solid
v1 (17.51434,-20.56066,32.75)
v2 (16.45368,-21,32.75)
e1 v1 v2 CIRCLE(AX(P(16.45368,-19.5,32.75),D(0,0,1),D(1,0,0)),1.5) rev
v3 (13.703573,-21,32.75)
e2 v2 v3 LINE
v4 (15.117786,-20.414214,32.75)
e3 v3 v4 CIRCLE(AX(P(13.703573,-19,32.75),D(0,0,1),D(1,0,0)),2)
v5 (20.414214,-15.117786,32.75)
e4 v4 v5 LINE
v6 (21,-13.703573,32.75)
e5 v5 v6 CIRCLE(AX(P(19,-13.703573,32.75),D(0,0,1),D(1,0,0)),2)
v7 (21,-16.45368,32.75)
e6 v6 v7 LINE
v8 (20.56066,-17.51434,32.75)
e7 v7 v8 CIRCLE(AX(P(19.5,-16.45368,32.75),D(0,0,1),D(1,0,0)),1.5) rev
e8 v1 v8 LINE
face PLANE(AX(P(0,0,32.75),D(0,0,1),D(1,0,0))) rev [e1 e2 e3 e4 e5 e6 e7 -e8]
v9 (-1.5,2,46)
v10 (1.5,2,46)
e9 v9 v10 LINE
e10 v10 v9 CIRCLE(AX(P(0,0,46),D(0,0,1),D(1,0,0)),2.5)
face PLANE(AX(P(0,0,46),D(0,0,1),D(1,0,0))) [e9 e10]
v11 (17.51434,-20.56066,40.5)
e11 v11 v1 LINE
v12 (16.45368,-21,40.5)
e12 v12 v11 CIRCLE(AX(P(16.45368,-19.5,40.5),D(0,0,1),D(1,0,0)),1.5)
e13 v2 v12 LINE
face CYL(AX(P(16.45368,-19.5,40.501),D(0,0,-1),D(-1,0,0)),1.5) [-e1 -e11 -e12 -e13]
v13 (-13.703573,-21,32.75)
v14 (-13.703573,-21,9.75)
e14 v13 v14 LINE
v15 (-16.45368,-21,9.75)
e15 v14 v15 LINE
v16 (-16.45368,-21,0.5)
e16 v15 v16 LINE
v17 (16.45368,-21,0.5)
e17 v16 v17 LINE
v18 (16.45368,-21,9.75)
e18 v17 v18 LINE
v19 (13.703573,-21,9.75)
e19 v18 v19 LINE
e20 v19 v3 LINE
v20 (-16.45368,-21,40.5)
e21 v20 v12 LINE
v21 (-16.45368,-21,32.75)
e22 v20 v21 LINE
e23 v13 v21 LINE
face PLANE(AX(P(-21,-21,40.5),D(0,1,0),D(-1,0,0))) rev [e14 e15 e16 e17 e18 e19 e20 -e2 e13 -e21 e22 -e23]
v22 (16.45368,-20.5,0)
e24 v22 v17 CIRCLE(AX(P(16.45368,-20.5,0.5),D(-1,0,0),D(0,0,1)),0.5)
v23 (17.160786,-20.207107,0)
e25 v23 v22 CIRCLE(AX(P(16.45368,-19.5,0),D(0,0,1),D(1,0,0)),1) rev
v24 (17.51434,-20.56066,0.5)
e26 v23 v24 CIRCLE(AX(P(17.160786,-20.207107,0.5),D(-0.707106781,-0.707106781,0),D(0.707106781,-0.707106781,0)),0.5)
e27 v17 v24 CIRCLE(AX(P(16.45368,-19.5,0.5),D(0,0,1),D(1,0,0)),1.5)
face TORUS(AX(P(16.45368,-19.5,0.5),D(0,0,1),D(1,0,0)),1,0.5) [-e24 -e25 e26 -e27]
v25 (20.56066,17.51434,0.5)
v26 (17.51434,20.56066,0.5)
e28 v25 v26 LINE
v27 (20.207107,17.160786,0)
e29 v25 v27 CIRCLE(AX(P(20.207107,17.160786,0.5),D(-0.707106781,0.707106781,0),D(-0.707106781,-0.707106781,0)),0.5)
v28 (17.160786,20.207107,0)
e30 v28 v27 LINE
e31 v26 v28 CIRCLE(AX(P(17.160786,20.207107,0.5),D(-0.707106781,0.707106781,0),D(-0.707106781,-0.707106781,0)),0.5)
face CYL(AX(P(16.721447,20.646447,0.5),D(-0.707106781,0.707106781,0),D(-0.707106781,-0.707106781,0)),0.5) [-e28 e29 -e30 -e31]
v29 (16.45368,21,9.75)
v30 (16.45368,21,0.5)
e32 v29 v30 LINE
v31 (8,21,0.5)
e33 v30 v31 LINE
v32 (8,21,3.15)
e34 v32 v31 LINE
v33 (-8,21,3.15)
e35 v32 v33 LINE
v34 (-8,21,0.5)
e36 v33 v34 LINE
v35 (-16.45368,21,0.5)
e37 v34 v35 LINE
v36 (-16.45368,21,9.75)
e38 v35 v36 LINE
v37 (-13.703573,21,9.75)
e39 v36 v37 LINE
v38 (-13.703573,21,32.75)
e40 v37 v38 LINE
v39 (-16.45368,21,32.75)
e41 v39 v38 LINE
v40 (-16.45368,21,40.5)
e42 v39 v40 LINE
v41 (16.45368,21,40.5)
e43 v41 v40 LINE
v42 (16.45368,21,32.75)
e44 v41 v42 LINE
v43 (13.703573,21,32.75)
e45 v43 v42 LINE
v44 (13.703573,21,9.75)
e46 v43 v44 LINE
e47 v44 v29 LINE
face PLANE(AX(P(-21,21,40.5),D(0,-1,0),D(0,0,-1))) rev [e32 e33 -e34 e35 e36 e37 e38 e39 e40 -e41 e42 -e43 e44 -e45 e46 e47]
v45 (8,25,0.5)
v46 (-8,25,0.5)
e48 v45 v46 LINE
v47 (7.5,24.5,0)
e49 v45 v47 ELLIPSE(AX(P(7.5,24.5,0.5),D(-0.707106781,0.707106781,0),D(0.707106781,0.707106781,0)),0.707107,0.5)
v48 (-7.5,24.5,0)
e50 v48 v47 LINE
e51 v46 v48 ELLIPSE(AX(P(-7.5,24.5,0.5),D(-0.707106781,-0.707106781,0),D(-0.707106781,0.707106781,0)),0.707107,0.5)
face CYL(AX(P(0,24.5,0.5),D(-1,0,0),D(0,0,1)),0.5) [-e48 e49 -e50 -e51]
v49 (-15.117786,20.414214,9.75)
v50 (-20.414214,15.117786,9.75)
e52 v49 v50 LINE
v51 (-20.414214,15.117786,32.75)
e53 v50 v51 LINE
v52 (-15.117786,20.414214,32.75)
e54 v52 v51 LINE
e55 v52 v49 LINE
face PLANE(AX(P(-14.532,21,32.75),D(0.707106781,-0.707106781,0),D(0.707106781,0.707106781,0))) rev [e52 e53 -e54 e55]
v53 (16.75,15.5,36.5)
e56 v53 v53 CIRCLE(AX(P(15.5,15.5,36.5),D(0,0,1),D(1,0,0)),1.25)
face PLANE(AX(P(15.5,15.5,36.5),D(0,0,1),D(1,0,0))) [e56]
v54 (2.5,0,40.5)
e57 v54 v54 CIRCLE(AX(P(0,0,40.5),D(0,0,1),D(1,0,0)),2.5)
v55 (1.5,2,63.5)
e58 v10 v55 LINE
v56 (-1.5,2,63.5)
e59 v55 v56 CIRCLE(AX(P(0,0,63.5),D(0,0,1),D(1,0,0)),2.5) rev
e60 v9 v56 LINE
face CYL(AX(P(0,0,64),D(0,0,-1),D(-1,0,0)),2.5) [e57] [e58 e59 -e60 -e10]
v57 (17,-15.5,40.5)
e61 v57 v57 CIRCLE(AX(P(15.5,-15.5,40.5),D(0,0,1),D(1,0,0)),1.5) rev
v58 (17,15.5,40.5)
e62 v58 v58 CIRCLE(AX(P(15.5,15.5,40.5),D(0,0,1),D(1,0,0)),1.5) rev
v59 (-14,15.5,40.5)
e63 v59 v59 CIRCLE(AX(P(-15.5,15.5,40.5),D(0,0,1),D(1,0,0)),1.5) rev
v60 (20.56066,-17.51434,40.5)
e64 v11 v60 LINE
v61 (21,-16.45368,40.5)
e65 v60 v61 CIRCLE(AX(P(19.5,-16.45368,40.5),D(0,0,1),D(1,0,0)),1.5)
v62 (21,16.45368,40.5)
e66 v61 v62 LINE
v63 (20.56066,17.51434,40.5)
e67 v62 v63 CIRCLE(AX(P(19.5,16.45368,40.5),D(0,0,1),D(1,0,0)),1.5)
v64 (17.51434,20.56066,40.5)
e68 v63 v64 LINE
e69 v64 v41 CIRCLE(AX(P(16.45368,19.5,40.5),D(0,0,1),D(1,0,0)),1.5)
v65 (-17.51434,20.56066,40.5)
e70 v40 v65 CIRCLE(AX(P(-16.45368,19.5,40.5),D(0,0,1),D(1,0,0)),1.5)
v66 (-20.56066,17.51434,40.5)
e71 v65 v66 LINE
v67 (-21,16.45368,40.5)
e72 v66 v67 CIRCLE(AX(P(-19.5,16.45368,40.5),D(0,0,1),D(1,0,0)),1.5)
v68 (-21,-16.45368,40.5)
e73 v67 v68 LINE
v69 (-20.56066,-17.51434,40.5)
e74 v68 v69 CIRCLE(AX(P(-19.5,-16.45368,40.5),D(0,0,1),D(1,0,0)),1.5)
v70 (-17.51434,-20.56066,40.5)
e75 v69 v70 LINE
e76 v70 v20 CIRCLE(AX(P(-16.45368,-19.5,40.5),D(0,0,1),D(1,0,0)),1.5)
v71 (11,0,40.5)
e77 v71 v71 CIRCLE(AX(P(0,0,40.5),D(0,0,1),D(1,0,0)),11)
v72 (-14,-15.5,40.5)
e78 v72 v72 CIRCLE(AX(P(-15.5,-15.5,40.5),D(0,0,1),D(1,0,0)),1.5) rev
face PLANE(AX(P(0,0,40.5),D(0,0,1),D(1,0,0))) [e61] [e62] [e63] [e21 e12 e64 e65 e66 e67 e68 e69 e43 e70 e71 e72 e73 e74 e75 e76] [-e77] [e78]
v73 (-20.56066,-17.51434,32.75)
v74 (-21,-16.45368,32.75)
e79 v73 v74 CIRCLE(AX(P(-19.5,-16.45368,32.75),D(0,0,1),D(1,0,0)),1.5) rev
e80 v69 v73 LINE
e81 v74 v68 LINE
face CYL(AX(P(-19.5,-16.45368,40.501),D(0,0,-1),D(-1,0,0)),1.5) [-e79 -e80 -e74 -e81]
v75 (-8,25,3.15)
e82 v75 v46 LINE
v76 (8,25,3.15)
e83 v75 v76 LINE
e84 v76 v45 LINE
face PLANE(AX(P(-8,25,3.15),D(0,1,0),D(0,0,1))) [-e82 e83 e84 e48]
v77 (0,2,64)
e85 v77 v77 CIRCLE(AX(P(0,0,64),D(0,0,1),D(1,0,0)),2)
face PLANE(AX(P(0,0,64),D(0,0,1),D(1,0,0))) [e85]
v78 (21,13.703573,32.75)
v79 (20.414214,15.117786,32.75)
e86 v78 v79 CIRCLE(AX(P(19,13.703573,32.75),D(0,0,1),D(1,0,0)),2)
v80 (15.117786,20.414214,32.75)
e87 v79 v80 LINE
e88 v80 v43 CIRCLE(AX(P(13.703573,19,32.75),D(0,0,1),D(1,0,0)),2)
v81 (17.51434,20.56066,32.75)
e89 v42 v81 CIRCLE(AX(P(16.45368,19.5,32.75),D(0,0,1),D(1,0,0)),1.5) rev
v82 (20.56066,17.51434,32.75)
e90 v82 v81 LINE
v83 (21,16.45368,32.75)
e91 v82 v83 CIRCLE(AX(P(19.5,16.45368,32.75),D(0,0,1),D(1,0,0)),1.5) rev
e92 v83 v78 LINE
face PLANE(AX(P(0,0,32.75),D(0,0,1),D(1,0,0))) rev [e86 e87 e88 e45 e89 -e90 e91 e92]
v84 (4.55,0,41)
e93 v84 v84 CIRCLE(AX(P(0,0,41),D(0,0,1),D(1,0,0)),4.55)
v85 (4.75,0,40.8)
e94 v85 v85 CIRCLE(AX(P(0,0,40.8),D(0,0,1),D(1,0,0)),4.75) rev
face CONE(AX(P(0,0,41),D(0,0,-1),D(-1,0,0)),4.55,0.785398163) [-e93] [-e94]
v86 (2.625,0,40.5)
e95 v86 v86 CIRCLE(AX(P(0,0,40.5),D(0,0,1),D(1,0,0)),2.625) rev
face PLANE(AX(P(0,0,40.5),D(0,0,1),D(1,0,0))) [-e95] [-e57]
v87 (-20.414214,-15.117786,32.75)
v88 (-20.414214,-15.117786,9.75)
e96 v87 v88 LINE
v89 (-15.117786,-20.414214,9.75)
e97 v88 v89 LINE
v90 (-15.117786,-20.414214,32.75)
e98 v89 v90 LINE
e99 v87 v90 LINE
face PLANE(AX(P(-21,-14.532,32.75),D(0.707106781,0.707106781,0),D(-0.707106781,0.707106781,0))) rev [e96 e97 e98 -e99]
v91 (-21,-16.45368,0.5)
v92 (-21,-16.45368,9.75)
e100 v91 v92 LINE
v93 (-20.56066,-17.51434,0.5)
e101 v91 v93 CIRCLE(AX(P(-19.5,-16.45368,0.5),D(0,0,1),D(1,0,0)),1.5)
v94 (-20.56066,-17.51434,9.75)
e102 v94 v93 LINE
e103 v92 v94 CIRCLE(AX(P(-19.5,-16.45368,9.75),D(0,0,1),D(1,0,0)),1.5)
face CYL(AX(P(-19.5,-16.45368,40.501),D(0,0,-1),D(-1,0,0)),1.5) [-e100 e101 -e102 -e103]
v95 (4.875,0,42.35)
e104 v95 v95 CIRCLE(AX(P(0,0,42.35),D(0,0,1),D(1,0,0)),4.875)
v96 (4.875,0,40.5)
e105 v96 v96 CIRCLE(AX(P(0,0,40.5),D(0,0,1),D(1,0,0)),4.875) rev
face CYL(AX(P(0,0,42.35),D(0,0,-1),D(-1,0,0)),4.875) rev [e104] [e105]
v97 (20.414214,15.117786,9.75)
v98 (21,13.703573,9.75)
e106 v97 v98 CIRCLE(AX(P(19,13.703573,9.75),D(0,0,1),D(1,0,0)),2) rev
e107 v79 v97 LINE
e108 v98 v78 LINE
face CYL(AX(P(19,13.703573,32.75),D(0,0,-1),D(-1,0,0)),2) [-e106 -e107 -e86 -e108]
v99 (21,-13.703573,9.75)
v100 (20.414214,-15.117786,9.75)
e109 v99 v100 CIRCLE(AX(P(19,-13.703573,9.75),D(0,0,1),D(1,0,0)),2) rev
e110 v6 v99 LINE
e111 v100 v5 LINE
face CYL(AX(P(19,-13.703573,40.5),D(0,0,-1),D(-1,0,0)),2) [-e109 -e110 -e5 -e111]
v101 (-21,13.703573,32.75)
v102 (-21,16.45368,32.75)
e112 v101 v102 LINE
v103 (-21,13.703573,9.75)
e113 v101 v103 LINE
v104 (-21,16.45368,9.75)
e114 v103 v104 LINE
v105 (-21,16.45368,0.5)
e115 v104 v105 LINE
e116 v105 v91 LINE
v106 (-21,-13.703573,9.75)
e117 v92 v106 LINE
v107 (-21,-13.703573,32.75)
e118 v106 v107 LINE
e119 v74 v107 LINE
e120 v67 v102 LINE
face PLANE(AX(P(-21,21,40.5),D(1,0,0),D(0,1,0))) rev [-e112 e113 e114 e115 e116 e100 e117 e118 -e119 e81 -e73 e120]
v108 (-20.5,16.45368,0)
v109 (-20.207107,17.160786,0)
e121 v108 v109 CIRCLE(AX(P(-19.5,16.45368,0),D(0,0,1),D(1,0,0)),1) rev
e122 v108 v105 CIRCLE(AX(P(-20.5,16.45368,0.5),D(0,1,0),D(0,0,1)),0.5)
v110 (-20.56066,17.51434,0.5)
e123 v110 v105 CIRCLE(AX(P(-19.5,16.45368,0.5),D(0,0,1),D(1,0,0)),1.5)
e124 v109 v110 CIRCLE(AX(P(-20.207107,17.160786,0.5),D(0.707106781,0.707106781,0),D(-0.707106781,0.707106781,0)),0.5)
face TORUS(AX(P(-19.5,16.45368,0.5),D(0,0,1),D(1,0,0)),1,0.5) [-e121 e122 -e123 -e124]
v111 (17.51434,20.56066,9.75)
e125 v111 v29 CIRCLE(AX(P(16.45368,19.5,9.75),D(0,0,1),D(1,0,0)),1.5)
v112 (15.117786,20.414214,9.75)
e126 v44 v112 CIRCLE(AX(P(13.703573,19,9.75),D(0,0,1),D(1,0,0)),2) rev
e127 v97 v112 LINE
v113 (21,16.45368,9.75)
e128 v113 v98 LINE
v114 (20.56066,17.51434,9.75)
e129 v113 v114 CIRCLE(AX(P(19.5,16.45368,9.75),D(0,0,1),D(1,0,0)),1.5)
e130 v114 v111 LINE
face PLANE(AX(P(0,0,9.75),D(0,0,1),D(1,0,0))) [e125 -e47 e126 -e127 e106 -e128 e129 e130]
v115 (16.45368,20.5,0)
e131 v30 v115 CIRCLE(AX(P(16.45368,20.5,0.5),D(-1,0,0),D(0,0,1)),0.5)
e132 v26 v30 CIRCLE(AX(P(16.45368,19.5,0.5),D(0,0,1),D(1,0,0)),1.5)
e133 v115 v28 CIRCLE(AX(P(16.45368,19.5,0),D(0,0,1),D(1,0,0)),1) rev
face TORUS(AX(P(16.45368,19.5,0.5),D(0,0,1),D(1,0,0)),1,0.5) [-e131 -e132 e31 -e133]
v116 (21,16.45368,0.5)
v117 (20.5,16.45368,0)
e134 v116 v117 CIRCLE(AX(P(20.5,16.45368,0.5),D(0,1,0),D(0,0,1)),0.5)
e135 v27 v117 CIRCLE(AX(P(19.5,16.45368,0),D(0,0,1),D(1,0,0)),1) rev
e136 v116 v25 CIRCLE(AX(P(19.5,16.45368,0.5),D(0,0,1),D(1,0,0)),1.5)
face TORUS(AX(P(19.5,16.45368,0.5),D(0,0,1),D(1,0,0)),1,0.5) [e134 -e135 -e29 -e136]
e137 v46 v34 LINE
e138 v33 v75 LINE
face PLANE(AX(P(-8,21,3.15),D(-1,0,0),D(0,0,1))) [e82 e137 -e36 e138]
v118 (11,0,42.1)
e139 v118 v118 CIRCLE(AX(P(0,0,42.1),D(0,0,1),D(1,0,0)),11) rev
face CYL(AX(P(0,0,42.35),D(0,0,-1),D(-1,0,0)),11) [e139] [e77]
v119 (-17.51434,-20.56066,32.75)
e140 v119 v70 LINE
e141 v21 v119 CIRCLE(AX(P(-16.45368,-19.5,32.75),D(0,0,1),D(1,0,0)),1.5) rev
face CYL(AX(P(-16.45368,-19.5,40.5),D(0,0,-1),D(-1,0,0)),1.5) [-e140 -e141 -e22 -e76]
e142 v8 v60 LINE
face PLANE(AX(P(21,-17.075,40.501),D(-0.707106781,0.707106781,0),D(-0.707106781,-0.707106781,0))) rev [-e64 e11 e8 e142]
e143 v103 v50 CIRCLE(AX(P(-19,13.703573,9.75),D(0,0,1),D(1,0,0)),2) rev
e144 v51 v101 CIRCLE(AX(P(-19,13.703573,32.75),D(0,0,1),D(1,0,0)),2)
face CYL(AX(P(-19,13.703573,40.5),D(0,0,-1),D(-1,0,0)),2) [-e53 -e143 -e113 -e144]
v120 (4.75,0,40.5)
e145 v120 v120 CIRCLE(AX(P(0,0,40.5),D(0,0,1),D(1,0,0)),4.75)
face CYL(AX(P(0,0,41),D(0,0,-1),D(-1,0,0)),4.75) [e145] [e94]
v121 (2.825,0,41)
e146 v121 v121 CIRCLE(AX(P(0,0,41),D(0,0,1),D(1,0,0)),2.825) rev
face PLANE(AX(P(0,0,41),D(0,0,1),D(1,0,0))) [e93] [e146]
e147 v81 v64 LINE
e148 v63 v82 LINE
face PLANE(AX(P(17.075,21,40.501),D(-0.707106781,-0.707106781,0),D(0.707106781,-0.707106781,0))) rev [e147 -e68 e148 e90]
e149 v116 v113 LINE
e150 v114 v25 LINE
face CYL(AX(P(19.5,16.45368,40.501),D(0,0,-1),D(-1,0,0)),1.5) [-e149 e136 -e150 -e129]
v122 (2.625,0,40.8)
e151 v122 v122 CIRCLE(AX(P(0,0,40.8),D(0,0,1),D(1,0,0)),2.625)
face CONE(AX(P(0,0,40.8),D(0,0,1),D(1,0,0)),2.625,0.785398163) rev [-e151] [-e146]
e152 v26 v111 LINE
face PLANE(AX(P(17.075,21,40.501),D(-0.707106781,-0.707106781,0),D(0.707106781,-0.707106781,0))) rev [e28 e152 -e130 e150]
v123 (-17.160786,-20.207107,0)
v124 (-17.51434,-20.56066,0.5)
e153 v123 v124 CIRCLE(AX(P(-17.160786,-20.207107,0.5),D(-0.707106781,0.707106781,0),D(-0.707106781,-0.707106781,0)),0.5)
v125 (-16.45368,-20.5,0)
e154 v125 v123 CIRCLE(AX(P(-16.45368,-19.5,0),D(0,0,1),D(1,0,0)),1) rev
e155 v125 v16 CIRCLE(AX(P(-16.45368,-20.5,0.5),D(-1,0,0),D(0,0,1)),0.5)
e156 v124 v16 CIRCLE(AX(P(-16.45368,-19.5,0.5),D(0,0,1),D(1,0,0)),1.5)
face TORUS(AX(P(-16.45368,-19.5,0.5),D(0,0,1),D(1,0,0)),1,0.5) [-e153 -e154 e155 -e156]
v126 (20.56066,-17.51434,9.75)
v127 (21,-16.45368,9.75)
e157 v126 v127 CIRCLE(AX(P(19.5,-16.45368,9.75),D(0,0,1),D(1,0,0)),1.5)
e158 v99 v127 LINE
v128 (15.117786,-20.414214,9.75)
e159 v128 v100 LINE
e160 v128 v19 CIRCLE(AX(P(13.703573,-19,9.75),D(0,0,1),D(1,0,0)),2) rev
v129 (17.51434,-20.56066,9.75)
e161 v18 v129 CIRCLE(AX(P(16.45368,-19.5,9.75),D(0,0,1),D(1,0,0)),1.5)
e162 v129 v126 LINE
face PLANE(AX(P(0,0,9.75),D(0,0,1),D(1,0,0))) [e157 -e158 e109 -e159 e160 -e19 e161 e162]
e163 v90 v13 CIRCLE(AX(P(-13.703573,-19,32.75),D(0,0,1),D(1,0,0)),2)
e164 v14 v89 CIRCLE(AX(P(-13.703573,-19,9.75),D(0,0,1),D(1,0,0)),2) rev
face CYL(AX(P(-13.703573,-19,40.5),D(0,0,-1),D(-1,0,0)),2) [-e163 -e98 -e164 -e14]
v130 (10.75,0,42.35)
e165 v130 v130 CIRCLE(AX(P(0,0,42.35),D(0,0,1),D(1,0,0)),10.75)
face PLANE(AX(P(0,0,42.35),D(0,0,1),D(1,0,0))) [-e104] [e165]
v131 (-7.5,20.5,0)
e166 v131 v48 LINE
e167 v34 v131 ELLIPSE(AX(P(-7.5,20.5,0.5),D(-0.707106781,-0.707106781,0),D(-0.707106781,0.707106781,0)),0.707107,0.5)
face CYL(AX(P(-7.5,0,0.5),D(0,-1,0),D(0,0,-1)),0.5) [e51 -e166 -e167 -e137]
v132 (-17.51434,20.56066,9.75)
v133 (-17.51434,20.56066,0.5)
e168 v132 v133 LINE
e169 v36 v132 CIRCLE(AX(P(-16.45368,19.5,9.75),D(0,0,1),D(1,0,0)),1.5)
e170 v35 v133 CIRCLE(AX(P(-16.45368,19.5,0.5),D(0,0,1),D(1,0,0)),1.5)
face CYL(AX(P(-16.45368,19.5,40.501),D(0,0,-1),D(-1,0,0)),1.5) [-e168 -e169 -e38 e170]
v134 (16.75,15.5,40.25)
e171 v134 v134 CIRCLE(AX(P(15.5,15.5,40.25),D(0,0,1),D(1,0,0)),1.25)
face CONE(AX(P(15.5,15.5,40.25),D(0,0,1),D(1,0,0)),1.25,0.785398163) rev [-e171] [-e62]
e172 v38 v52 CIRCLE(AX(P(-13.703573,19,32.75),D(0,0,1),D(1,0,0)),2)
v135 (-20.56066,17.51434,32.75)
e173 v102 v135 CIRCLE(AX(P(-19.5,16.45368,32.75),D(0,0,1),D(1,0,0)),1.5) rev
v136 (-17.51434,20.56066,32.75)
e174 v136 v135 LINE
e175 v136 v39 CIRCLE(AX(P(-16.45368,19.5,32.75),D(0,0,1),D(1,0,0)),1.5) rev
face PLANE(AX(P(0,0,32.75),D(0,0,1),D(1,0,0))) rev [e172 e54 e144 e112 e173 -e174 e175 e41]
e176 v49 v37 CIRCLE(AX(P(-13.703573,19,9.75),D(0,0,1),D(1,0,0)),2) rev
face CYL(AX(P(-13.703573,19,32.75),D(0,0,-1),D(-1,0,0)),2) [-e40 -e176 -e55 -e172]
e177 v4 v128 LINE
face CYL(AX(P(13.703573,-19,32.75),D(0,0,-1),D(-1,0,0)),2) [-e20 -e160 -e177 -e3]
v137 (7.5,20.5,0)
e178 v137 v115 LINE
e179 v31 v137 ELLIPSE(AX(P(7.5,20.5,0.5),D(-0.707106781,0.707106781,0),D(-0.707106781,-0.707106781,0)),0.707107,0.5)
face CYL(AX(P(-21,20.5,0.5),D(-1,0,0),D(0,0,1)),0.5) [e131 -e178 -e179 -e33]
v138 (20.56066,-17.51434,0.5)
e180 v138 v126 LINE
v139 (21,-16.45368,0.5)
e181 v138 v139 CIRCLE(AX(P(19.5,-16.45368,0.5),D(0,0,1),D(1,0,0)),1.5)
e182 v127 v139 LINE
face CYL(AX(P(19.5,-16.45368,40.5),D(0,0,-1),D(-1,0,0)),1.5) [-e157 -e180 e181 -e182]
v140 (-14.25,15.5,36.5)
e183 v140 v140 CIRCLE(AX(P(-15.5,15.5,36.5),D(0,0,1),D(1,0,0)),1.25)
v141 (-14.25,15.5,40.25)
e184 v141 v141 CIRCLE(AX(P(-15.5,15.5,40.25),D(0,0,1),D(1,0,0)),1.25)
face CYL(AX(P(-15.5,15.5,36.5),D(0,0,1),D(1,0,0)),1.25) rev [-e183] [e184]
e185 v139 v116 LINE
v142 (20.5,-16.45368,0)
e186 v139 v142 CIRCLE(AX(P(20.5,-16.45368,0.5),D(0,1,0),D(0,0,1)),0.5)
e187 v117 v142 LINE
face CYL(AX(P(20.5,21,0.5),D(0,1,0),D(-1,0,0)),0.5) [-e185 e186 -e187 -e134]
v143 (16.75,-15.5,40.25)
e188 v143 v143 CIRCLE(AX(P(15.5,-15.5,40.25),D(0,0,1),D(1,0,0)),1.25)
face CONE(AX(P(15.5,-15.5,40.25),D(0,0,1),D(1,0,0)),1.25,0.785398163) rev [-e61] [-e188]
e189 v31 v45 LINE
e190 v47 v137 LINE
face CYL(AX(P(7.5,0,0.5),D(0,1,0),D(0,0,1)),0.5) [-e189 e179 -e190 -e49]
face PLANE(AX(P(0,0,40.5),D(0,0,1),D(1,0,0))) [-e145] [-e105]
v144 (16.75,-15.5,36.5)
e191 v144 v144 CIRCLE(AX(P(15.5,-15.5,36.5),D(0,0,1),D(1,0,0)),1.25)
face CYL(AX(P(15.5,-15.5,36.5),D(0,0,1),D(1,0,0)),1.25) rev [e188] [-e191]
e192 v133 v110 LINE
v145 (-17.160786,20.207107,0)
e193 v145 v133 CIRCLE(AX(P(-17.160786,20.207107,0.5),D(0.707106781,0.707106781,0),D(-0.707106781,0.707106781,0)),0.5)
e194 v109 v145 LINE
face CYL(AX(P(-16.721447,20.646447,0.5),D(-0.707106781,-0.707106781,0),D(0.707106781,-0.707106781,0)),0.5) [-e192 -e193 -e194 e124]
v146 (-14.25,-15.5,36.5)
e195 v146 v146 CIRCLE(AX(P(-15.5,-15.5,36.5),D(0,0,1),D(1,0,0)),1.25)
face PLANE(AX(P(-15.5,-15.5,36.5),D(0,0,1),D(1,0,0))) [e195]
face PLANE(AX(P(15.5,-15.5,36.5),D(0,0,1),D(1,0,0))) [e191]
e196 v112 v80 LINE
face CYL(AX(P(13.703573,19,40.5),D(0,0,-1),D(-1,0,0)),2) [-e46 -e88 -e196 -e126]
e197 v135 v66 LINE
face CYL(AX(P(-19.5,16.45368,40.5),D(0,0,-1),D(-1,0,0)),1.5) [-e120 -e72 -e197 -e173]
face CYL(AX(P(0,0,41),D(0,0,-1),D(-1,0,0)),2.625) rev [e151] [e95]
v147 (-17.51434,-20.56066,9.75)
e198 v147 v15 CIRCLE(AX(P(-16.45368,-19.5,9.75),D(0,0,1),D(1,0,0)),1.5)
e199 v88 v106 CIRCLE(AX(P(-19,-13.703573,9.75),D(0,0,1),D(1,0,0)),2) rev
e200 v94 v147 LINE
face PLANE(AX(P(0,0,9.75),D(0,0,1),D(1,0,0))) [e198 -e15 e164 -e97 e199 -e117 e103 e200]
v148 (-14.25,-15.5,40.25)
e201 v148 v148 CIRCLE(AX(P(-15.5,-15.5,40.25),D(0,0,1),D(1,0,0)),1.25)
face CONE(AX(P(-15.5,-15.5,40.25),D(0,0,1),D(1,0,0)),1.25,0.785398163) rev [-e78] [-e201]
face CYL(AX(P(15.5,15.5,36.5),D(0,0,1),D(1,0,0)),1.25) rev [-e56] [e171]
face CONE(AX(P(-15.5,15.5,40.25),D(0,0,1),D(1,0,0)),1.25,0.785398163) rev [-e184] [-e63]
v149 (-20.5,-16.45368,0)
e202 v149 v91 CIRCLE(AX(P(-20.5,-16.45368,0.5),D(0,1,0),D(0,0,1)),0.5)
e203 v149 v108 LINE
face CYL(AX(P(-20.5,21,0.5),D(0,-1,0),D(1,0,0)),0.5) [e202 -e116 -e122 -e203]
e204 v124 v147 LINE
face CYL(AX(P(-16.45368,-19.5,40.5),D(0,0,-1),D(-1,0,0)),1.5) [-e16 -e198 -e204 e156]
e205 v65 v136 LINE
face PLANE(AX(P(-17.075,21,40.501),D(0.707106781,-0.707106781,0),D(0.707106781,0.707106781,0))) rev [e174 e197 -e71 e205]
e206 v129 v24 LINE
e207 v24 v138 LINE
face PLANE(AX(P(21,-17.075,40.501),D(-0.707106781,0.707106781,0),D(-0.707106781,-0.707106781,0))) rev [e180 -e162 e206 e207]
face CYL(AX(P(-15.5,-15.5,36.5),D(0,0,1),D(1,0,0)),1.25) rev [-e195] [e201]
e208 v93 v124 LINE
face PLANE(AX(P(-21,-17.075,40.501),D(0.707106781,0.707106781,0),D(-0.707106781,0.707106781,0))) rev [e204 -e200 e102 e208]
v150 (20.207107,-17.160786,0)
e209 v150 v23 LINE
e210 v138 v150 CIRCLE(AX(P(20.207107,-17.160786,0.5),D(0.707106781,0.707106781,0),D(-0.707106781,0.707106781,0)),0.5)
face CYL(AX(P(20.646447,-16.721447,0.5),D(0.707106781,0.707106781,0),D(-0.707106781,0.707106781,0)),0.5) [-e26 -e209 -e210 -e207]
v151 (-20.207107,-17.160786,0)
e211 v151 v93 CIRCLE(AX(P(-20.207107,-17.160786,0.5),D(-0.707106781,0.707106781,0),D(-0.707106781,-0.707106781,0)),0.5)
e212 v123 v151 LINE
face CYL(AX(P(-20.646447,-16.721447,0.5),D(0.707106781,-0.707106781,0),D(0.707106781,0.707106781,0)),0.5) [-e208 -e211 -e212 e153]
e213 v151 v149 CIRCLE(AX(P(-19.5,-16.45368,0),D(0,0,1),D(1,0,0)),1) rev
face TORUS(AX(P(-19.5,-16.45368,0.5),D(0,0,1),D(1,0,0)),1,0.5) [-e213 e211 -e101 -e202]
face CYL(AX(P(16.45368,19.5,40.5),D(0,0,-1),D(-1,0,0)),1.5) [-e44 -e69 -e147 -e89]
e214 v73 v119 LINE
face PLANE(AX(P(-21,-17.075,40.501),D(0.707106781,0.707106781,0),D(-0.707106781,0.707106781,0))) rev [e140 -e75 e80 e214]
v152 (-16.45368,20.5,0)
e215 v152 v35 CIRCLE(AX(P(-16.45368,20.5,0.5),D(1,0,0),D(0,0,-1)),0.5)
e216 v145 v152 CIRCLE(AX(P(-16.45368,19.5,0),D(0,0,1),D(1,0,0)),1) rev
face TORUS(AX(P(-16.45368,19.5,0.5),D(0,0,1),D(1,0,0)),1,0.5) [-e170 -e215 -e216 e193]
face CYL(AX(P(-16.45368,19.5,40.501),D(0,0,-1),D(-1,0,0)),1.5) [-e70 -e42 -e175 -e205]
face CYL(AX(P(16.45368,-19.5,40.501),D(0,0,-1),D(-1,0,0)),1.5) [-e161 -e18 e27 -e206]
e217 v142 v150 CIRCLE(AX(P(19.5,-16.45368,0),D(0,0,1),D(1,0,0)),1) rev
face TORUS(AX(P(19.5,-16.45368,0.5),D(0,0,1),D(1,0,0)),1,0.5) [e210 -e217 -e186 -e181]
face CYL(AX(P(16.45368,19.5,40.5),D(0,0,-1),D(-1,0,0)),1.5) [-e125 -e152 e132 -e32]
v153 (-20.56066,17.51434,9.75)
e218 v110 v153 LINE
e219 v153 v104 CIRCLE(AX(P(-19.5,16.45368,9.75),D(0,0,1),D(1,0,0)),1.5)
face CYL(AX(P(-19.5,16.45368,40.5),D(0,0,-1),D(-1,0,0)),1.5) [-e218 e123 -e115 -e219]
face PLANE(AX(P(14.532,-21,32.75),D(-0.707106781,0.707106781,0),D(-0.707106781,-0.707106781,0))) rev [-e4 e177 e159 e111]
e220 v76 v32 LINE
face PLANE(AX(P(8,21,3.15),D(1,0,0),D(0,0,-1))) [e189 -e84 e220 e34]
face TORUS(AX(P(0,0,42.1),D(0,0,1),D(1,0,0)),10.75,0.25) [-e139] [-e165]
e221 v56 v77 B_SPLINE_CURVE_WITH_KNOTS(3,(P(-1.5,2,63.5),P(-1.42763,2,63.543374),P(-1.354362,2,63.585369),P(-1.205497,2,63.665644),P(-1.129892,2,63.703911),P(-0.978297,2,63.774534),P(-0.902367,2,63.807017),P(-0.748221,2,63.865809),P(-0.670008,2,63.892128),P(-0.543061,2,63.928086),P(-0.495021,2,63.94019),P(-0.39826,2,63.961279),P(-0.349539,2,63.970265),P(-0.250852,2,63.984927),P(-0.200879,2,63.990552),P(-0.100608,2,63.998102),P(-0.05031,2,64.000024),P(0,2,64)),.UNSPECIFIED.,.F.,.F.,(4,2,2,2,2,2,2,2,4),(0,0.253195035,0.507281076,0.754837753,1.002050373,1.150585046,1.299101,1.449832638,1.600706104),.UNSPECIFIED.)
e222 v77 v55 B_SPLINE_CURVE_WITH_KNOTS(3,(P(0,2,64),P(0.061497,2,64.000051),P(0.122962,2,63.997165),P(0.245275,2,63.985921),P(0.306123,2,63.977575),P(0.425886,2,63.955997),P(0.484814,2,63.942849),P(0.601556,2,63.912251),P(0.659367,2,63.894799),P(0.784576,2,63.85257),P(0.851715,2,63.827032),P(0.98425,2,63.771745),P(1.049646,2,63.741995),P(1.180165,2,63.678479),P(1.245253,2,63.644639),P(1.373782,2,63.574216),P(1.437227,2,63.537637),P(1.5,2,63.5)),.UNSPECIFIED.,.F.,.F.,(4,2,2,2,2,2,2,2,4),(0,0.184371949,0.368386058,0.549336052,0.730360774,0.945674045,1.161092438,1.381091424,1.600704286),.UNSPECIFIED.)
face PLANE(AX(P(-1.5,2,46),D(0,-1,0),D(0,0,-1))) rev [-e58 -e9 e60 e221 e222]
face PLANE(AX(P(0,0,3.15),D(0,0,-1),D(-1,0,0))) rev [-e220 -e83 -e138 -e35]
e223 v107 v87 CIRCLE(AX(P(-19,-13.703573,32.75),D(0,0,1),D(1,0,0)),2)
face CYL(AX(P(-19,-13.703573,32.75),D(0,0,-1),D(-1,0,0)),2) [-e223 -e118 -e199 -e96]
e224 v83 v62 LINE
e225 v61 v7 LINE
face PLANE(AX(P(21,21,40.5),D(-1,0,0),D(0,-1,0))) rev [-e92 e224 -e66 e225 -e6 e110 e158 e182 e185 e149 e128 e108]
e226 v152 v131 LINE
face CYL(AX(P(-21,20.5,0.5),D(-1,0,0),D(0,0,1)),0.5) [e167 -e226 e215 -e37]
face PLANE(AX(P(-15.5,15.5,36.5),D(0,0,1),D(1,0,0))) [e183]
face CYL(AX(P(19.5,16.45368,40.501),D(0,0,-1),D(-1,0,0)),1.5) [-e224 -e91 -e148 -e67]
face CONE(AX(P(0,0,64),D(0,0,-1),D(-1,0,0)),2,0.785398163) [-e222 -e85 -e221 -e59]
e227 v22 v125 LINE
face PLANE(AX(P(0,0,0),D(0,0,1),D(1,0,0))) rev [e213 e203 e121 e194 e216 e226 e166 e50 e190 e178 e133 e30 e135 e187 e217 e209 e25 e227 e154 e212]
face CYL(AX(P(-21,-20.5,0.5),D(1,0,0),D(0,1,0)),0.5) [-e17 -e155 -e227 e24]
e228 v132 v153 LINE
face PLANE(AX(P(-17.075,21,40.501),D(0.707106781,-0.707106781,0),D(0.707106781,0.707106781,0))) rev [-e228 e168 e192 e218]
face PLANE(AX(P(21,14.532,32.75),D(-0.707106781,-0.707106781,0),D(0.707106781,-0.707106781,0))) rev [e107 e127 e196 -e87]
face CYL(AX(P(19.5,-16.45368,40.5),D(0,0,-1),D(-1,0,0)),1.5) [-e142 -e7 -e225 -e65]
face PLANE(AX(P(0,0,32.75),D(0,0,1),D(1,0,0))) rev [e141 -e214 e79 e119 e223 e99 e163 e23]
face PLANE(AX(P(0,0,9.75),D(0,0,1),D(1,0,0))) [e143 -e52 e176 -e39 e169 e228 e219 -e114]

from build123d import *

# Parameters (mm, degrees)
SKETCH_1_W          = 42
SKETCH_1_H          = 42
EXTRUDE_1_DEPTH     = 40.5
SKETCH_2_W          = 16
SKETCH_2_H          = 4
EXTRUDE_2_DEPTH     = 3.15
CUT_EXTRUDE_1_REACH = 54.022
CUT_EXTRUDE_START   = -9.75
CUT_EXTRUDE_2_DEPTH = 23
SKETCH_5_R          = 11
SKETCH_5_R_2        = 4.875
EXTRUDE_4_DEPTH     = 1.85
SKETCH_6_R          = 4.75
SKETCH_6_R_2        = 2.625
EXTRUDE_5_DEPTH     = 0.5
CHAMFER_1_SIZE      = 0.2
SKETCH_7_R          = 2.5
EXTRUDE_6_DEPTH     = 23.5
SKETCH_8_R          = 1.25
CUT_EXTRUDE_3_DEPTH = 4
CHAMFER_2_SIZE      = 0.25
CUT_EXTRUDE_START_2 = -18
CUT_EXTRUDE_4_DEPTH = 18
CHAMFER_3_SIZE      = 0.5
FILLET_1_R          = 0.25
FILLET_2_R          = 1.5
FILLET_3_R          = 2
FILLET_4_R          = 0.5


with BuildPart() as part:
    # 草图1 → 凸台-拉伸1 (new body)
    with BuildSketch(Plane.XY):
        Rectangle(SKETCH_1_W, SKETCH_1_H)
    extrude(amount=EXTRUDE_1_DEPTH)

    # 草图2 → 凸台-拉伸2 (add)
    with BuildSketch(Plane(origin=(0, 0, 0), x_dir=(-1, 0, 0), z_dir=(0, 0, -1))):
        with Locations((0, 23)):
            Rectangle(SKETCH_2_W, SKETCH_2_H)
    extrude(amount=-EXTRUDE_2_DEPTH)

    # 草图3 → 切除-拉伸1 (cut, up to next)
    with BuildSketch(Plane(origin=(0, 0, 0), x_dir=(-1, 0, 0), z_dir=(0, 0, -1)), mode=Mode.PRIVATE) as cut_extrude_1_sk1:
        Polygon((-17.075, 21), (-21, 17.075), (-21, 21), align=None)
    cut_extrude_1_tool1 = extrude(cut_extrude_1_sk1.sketch, amount=-CUT_EXTRUDE_1_REACH, mode=Mode.PRIVATE) & part.part
    # 草图3 → 切除-拉伸1 (cut, up to next)
    with BuildSketch(Plane(origin=(0, 0, 0), x_dir=(-1, 0, 0), z_dir=(0, 0, -1)), mode=Mode.PRIVATE) as cut_extrude_1_sk2:
        Polygon((17.075, 21), (21, 17.075), (21, 21), align=None)
    cut_extrude_1_tool2 = extrude(cut_extrude_1_sk2.sketch, amount=-CUT_EXTRUDE_1_REACH, mode=Mode.PRIVATE) & part.part
    # 草图3 → 切除-拉伸1 (cut, up to next)
    with BuildSketch(Plane(origin=(0, 0, 0), x_dir=(-1, 0, 0), z_dir=(0, 0, -1)), mode=Mode.PRIVATE) as cut_extrude_1_sk3:
        Polygon((21, -17.075), (17.075, -21), (21, -21), align=None)
    cut_extrude_1_tool3 = extrude(cut_extrude_1_sk3.sketch, amount=-CUT_EXTRUDE_1_REACH, mode=Mode.PRIVATE) & part.part
    # 草图3 → 切除-拉伸1 (cut, up to next)
    with BuildSketch(Plane(origin=(0, 0, 0), x_dir=(-1, 0, 0), z_dir=(0, 0, -1)), mode=Mode.PRIVATE) as cut_extrude_1_sk4:
        Polygon((-21, -17.075), (-17.075, -21), (-21, -21), align=None)
    cut_extrude_1_tool4 = extrude(cut_extrude_1_sk4.sketch, amount=-CUT_EXTRUDE_1_REACH, mode=Mode.PRIVATE) & part.part
    add(cut_extrude_1_tool1.solids().sort_by_distance((19.691667, 19.691667, 0))[0], mode=Mode.SUBTRACT)
    add(cut_extrude_1_tool2.solids().sort_by_distance((-19.691667, 19.691667, 0))[0], mode=Mode.SUBTRACT)
    add(cut_extrude_1_tool3.solids().sort_by_distance((-19.691667, -19.691667, 0))[0], mode=Mode.SUBTRACT)
    add(cut_extrude_1_tool4.solids().sort_by_distance((19.691667, -19.691667, 0))[0], mode=Mode.SUBTRACT)

    # 草图4 → 切除-拉伸2 (cut)
    with BuildSketch(Plane(origin=(0, 0, 0), x_dir=(-1, 0, 0), z_dir=(0, 0, -1)).offset(CUT_EXTRUDE_START)):
        Polygon((-21, 14.532), (-14.532, 21), (-21, 21), align=None)
        Polygon((14.532, 21), (21, 14.532), (21, 21), align=None)
        Polygon((21, -14.532), (14.532, -21), (21, -21), align=None)
        Polygon((-14.532, -21), (-21, -14.532), (-21, -21), align=None)
    extrude(amount=-CUT_EXTRUDE_2_DEPTH, mode=Mode.SUBTRACT)

    # 草图5 → 凸台-拉伸4 (add)
    with BuildSketch(Plane.XY.offset(40.5)):
        Circle(SKETCH_5_R)
        Circle(SKETCH_5_R_2, mode=Mode.SUBTRACT)
    extrude(amount=EXTRUDE_4_DEPTH)

    # 草图6 → 凸台-拉伸5 (add)
    with BuildSketch(Plane.XY.offset(40.5)):
        Circle(SKETCH_6_R)
        Circle(SKETCH_6_R_2, mode=Mode.SUBTRACT)
    extrude(amount=EXTRUDE_5_DEPTH)

    # 倒角1
    chamfer_1_edges = [part.edges().sort_by_distance(p)[0] for p in [
        (-4.75, 0, 41),
        (-2.625, 0, 41),
    ]]
    chamfer(chamfer_1_edges, length=CHAMFER_1_SIZE)

    # 草图7 → 凸台-拉伸6 (add)
    with BuildSketch(Plane.XY.offset(40.5)):
        Circle(SKETCH_7_R)
    extrude(amount=EXTRUDE_6_DEPTH)

    # 草图8 → 切除-拉伸3 (cut)
    with BuildSketch(Plane.XY.offset(40.5)):
        with Locations((-15.5, 15.5)):
            Circle(SKETCH_8_R)
        with Locations((15.5, 15.5)):
            Circle(SKETCH_8_R)
        with Locations((15.5, -15.5)):
            Circle(SKETCH_8_R)
        with Locations((-15.5, -15.5)):
            Circle(SKETCH_8_R)
    extrude(amount=-CUT_EXTRUDE_3_DEPTH, mode=Mode.SUBTRACT)

    # 倒角2
    chamfer_2_edges = [part.edges().sort_by_distance(p)[0] for p in [
        (-16.75, -15.5, 40.5),
        (14.25, -15.5, 40.5),
        (14.25, 15.5, 40.5),
        (-16.75, 15.5, 40.5),
    ]]
    chamfer(chamfer_2_edges, length=CHAMFER_2_SIZE)

    # 草图9 → 切除-拉伸4 (cut)
    with BuildSketch(Plane.XY.offset(64).offset(CUT_EXTRUDE_START_2)):
        with BuildLine():
            Line((-1.5, 2), (1.5, 2))
            ThreePointArc((1.5, 2), (0, 2.5), (-1.5, 2))
        make_face()
    extrude(amount=CUT_EXTRUDE_4_DEPTH, mode=Mode.SUBTRACT)

    # 倒角3
    chamfer_3_edges = [part.edges().sort_by_distance(p)[0] for p in [
        (-1.118033989, -2.236067977, 64),
    ]]
    chamfer(chamfer_3_edges, length=CHAMFER_3_SIZE - 0.0001)  # a hair under: the kernel refuses the full size

    # 圆角1
    fillet_1_edges = [part.edges().sort_by_distance(p)[0] for p in [
        (-11, 0, 42.35),
    ]]
    fillet(fillet_1_edges, radius=FILLET_1_R)

    # 圆角2
    fillet_2_edges = [part.edges().sort_by_distance(p)[0] for p in [
        (21, -17.075, 36.625),
        (17.075, -21, 36.625),
        (-21, -17.075, 36.625),
        (-17.075, -21, 36.625),
        (-17.075, 21, 36.625),
        (-21, 17.075, 36.625),
        (17.075, 21, 36.625),
        (21, 17.075, 36.625),
        (17.075, -21, 4.875),
        (21, -17.075, 4.875),
        (-21, -17.075, 4.875),
        (-17.075, -21, 4.875),
        (-17.075, 21, 4.875),
        (-21, 17.075, 4.875),
        (21, 17.075, 4.875),
        (17.075, 21, 4.875),
    ]]
    fillet(fillet_2_edges, radius=FILLET_2_R)

    # 圆角3
    fillet_3_edges = [part.edges().sort_by_distance(p)[0] for p in [
        (-21, -14.532, 21.25),
        (-14.532, -21, 21.25),
        (-14.532, 21, 21.25),
        (-21, 14.532, 21.25),
        (21, 14.532, 21.25),
        (14.532, 21, 21.25),
        (14.532, -21, 21.25),
        (21, -14.532, 21.25),
    ]]
    fillet(fillet_3_edges, radius=FILLET_3_R)

    # 圆角4
    fillet_4_edges = [part.edges().sort_by_distance(p)[0] for p in [
        (-12.226839828, 21, 0),
        (-8, 23, 0),
        (0, 25, 0),
        (8, 23, 0),
        (-21, 0, 0),
        (0, -21, 0),
        (21, 0, 0),
        (19.0375, -19.0375, 0),
        (-19.0375, -19.0375, 0),
        (-19.0375, 19.0375, 0),
        (12.226839828, 21, 0),
        (19.0375, 19.0375, 0),
        (17.027704805, 20.885819299, 0),
        (20.885819299, 17.027704805, 0),
        (20.885819299, -17.027704805, 0),
        (17.027704805, -20.885819299, 0),
        (-20.885819299, 17.027704805, 0),
        (-17.027704805, 20.885819299, 0),
        (-20.885819299, -17.027704805, 0),
        (-17.027704805, -20.885819299, 0),
    ]]
    fillet(fillet_4_edges, radius=FILLET_4_R)


solid = part.part
